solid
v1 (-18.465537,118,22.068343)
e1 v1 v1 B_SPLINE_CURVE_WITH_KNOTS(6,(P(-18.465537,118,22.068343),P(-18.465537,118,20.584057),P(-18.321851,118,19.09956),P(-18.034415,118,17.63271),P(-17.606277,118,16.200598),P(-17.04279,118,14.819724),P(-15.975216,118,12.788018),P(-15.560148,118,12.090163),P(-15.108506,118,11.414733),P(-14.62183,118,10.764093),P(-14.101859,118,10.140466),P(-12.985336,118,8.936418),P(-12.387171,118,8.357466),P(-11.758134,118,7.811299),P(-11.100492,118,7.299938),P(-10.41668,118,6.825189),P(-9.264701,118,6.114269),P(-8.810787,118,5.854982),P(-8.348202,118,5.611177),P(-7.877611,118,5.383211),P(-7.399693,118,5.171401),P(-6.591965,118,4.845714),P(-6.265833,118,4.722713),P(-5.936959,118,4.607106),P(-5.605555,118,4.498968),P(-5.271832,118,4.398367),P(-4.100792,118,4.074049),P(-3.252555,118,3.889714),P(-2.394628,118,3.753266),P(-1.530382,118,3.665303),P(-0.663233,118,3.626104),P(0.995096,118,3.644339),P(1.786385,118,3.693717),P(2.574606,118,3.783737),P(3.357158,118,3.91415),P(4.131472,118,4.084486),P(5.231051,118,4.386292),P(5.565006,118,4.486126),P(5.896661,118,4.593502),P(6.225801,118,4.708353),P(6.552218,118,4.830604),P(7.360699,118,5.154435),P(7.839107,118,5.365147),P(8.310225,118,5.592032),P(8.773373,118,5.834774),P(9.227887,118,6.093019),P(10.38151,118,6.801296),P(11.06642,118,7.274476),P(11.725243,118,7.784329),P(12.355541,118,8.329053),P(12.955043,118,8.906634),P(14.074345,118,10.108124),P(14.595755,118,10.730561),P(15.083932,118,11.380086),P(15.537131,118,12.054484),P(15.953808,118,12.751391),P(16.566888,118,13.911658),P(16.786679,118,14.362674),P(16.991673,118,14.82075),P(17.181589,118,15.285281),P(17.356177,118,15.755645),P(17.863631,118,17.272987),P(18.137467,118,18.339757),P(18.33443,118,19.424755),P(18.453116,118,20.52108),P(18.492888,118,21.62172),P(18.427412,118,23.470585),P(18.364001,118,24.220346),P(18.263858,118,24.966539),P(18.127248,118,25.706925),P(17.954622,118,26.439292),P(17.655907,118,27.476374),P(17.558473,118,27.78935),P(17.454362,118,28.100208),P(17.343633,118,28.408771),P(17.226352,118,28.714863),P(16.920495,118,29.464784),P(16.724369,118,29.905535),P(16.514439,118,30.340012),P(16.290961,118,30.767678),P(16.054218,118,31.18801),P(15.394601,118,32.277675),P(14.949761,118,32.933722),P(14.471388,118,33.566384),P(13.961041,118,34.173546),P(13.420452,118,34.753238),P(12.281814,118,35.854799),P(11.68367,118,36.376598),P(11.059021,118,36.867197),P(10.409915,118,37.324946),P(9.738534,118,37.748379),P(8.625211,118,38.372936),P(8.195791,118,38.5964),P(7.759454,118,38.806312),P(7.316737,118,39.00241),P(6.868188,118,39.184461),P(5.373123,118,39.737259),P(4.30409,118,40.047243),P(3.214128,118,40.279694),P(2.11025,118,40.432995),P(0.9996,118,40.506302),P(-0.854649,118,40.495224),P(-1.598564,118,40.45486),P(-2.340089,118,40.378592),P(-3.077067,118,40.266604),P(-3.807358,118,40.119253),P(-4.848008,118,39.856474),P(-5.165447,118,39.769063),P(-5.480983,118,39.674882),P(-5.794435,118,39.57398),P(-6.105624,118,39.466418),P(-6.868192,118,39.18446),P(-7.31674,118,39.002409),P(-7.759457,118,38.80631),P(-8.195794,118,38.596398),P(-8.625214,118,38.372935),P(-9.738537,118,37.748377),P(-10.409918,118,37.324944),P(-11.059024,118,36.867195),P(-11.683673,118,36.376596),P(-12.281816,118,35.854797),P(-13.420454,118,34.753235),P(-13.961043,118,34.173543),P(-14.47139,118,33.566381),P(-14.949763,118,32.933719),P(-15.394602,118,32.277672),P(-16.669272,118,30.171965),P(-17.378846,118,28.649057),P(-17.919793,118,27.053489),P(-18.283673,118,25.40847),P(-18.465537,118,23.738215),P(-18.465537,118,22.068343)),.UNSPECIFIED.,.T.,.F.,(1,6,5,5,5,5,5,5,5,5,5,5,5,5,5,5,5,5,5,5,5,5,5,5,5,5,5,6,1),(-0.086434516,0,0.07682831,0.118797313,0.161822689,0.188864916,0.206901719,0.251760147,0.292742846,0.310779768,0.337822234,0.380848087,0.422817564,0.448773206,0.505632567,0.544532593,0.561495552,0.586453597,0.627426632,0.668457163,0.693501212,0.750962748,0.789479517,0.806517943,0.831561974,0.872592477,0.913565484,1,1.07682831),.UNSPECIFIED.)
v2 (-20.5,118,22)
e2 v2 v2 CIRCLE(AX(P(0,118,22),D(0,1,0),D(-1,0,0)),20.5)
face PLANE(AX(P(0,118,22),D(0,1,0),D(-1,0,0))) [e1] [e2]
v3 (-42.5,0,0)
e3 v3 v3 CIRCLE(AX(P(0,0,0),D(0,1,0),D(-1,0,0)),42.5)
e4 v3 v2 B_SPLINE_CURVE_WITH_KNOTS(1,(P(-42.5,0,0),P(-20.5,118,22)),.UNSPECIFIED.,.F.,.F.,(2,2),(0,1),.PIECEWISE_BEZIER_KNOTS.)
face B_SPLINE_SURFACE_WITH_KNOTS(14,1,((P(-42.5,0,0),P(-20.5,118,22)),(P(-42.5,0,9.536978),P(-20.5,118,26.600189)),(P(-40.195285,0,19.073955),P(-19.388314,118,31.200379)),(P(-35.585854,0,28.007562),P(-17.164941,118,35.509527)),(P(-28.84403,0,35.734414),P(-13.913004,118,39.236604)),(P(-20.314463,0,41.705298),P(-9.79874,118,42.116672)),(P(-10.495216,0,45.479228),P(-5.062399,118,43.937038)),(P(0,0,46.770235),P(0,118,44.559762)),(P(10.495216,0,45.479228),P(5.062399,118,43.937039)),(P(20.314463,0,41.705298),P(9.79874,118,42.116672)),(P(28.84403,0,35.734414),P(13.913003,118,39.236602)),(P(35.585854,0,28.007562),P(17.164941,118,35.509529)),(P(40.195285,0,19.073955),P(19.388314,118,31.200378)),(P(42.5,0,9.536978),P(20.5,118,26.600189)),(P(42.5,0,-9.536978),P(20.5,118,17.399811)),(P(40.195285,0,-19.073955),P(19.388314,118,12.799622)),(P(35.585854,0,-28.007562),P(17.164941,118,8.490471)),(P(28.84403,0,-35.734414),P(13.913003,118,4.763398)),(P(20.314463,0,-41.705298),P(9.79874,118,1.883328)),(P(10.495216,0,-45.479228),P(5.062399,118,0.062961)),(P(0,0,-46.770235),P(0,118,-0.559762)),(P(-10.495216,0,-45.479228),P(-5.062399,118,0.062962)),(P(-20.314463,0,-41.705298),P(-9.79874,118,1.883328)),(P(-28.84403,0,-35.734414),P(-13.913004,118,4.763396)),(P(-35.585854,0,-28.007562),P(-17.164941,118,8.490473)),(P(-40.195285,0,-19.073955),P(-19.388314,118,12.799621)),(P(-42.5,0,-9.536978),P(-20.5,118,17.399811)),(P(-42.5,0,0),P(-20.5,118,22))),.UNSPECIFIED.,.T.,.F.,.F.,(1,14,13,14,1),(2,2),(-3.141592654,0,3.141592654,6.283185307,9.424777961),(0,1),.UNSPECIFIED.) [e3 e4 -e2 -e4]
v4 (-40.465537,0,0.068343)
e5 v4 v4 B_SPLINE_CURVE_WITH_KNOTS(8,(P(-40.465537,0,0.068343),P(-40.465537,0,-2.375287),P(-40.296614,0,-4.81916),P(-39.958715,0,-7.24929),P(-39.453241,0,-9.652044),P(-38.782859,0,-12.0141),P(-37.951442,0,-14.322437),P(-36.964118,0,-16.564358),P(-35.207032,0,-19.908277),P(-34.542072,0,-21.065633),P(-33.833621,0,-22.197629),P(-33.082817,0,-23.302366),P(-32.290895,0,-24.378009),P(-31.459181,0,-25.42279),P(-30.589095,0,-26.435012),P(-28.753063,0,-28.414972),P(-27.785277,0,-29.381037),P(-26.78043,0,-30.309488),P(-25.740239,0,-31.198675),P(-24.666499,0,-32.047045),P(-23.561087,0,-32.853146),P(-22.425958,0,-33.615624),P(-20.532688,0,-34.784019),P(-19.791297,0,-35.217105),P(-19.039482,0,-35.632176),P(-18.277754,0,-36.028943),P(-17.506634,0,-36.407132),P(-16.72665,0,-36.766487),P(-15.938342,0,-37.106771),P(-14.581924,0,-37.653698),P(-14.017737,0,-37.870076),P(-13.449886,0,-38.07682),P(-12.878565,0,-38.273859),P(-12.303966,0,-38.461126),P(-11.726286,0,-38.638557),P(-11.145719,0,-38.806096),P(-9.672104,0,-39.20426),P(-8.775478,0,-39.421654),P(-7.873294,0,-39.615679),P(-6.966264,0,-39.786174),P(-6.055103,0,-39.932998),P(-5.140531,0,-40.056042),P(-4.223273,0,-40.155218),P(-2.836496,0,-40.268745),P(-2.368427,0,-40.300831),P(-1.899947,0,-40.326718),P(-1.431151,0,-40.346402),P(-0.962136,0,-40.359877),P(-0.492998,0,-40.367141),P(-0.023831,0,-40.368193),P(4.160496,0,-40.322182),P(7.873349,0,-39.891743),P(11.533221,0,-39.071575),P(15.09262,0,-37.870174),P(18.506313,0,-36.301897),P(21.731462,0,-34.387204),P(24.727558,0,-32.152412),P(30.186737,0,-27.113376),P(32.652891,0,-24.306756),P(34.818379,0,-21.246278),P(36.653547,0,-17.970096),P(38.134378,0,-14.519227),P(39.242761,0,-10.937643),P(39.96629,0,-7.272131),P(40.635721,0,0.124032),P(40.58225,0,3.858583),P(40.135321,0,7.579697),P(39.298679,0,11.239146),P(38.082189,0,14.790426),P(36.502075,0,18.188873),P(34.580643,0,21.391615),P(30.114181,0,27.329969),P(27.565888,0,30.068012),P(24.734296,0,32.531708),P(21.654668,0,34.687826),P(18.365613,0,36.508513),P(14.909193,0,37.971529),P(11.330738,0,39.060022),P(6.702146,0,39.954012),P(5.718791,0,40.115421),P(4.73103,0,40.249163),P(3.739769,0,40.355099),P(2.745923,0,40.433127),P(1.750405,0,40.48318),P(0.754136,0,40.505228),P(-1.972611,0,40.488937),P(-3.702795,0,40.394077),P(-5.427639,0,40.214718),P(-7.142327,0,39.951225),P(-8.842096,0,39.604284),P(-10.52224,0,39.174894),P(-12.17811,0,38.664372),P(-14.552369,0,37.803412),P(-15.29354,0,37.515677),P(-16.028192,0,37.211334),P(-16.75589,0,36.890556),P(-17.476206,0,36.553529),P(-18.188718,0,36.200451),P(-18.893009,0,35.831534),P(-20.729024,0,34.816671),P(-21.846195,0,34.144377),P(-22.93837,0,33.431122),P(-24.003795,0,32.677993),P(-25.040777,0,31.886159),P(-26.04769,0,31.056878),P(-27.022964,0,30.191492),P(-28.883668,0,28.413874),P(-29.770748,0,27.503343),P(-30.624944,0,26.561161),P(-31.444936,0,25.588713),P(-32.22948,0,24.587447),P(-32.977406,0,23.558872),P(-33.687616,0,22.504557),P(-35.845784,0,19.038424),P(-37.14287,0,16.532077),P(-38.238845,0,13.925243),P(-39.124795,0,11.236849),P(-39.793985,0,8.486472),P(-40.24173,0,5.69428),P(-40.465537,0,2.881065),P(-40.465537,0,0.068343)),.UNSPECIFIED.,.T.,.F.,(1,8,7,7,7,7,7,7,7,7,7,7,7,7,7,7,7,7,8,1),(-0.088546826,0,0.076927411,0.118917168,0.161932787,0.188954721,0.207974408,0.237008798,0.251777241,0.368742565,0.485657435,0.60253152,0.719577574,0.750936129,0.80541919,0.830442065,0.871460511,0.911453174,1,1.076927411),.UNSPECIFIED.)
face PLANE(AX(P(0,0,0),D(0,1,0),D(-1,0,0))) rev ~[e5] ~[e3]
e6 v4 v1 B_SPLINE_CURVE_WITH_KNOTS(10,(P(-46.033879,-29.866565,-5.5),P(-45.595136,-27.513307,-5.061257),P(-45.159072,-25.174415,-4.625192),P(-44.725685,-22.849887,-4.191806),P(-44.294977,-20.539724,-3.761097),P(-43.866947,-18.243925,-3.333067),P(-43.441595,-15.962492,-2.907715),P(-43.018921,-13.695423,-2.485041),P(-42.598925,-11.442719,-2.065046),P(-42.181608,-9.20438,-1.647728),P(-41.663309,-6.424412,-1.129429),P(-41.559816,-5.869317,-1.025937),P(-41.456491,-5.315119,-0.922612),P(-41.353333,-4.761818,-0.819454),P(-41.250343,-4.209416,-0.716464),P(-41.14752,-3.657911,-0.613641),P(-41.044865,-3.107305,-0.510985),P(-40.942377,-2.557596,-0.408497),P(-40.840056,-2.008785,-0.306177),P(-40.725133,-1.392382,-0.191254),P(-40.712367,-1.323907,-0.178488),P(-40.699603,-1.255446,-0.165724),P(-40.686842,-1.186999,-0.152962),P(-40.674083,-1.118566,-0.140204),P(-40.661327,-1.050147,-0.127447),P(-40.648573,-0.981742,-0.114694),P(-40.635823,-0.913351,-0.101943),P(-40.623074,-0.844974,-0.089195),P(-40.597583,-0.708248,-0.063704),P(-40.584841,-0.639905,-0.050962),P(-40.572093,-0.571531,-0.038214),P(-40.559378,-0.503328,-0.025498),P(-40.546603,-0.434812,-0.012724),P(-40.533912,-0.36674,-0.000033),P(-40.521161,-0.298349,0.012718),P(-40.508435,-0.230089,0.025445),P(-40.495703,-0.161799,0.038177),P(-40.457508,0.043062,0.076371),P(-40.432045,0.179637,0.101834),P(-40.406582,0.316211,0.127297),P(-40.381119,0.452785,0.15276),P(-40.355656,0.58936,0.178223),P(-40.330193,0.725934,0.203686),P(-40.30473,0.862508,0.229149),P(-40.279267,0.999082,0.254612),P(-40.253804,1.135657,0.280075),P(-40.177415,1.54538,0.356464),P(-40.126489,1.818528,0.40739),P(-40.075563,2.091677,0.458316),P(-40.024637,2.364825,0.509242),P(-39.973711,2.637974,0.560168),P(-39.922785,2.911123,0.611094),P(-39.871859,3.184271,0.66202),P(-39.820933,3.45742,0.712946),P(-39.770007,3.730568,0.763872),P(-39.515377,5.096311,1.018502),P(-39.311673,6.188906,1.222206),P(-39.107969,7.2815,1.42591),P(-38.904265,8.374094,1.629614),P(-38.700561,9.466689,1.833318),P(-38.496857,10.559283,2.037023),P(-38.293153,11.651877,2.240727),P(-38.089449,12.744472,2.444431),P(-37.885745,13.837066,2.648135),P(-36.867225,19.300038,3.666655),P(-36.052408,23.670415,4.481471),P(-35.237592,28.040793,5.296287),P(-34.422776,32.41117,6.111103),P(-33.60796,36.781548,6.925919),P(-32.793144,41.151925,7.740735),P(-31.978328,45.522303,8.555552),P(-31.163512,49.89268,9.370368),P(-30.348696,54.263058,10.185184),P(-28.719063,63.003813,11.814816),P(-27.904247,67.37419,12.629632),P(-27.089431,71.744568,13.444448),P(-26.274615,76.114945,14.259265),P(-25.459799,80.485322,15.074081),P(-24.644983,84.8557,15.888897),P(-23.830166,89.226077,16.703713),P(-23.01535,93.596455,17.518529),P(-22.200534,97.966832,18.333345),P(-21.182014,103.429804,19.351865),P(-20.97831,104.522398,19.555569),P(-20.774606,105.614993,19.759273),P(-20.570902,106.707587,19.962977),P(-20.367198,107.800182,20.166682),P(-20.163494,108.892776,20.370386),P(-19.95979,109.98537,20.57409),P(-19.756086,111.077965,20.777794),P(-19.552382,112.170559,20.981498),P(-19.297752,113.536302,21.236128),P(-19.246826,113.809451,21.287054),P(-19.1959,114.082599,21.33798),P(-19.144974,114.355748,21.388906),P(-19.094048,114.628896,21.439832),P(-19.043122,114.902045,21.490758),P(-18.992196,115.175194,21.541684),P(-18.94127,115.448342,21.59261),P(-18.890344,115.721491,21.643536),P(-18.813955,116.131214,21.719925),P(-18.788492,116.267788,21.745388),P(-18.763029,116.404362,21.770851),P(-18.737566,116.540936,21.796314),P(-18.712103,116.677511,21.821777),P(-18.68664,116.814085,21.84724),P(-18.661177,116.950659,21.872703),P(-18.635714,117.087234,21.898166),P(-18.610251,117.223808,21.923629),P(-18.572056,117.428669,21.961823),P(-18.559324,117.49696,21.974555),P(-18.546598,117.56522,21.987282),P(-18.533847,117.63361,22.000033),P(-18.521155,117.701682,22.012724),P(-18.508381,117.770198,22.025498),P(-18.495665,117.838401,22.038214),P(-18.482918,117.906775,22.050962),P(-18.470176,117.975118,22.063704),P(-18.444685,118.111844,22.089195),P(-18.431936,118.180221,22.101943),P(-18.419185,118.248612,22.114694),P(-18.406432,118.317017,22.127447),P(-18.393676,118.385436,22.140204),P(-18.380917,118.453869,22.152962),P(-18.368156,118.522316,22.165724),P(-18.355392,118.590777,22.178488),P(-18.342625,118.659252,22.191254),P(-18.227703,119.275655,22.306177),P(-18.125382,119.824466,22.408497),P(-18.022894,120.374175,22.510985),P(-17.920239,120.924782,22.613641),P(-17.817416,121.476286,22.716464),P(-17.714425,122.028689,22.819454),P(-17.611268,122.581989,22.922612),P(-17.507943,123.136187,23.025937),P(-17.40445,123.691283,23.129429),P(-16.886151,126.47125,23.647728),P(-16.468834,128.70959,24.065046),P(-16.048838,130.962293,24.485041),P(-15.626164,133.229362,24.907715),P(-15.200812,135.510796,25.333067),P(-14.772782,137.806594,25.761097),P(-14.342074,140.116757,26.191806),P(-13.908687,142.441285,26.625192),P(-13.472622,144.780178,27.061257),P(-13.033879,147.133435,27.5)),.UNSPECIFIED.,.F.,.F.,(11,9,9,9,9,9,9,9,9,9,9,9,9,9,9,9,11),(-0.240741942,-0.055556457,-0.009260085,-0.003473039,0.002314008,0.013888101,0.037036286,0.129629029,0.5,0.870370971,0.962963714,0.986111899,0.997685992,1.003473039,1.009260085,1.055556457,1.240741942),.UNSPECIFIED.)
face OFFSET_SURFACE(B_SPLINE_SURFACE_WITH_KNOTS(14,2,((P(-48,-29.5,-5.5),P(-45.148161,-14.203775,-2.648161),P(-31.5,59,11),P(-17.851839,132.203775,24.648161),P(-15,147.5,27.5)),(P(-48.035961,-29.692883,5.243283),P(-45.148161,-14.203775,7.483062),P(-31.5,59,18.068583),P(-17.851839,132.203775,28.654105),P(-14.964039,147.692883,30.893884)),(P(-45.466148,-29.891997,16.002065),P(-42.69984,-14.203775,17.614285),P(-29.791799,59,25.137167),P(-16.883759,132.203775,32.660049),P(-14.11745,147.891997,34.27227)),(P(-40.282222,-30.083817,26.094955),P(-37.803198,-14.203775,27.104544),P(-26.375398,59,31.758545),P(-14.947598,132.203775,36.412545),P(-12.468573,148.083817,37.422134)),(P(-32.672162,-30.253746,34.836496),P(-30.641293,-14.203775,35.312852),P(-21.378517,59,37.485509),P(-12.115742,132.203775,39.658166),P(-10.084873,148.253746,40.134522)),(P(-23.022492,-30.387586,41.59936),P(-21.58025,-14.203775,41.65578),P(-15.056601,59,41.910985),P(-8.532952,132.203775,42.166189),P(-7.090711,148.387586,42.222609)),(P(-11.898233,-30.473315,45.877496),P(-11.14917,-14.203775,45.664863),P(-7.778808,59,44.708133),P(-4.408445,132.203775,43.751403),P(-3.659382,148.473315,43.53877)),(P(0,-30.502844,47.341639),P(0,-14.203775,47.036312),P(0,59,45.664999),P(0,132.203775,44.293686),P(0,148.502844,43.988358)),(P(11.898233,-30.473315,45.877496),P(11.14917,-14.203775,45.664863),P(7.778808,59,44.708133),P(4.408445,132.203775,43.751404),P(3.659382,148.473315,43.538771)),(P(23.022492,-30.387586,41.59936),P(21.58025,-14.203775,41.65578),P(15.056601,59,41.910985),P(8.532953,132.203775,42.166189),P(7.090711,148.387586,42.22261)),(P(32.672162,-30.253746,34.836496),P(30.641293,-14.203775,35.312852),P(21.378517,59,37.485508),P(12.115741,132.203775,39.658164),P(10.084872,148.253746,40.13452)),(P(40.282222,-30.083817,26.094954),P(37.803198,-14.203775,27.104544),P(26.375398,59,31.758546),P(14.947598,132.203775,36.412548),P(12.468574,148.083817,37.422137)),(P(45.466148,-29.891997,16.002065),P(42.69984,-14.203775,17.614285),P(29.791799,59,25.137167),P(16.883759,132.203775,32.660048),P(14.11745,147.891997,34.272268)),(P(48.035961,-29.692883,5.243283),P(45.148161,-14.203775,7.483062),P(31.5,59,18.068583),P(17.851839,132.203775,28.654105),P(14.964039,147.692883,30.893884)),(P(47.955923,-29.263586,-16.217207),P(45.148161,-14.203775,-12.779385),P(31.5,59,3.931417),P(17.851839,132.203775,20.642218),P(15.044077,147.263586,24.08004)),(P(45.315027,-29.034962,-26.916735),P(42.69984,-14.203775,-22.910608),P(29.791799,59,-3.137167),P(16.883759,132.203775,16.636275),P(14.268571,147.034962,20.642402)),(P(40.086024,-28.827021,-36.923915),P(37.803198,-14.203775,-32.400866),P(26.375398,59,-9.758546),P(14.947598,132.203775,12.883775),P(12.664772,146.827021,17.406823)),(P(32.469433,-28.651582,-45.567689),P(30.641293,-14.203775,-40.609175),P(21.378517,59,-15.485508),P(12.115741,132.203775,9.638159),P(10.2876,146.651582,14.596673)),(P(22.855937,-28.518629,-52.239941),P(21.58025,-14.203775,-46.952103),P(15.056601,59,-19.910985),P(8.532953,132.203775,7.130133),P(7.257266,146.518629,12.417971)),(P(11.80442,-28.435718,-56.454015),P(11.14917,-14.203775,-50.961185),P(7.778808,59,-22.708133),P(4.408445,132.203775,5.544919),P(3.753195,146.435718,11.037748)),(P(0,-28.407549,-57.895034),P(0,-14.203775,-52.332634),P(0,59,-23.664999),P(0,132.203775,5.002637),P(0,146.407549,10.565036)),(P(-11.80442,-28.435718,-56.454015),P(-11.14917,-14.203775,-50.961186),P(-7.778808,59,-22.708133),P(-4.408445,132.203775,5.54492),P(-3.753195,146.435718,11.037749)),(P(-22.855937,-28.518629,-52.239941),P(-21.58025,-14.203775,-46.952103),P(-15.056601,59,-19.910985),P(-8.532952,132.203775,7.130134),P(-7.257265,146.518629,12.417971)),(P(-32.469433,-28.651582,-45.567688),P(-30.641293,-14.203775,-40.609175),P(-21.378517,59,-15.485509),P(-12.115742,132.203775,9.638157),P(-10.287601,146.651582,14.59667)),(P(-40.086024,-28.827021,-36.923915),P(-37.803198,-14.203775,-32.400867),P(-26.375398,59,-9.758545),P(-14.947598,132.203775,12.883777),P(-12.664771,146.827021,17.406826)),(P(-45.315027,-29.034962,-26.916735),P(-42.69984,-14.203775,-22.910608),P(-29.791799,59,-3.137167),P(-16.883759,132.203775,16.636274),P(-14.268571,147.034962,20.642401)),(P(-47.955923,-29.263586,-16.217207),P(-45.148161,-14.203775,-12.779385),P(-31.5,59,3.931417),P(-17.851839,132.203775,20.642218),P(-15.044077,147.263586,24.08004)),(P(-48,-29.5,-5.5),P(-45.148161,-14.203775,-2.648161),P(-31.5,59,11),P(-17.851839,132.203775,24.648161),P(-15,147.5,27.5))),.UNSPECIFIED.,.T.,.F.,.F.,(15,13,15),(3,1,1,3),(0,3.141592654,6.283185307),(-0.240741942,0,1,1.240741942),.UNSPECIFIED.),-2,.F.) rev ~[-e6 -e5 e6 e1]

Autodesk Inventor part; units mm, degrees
ref_plane "YZ Plane" through (0, 0, 0) normal (1, 0, 0) x (0, 1, 0)
ref_plane "XY Plane" through (0, 0, 0) normal (0, 0, 1) x (1, 0, 0)
sketch "Szkic6" plane through (0, 0, 0) normal (0, 1, 0) x (-1, 0, 0)
  circle A0 centre (0, 0) radius 42.5
  dimension "d33" = 85
ref_plane "Płaszczyzna konstrukcyjna1" through (0, 118, 0) normal (0, 1, 0) x (-1, 0, 0)
sketch "Szkic7" plane through (0, 118, 0) normal (0, 1, 0) x (-1, 0, 0)
  circle A0 centre (0, 22) radius 20.5
  line L0 (0, -20.3) -> (0, 20.3) construction
  circle A1 centre (0, 0) radius 42.5 construction
  dimension "d35" = 41
loft "Wyciągnięcie złożone1" add profiles "Szkic6", "Szkic7"
shell "Skorupa1" thickness 2 removed faces 2 at (4.592, 118, 24.4101) at (10.6049, 0, 7.3037)
equation "\"d33\" = OD1"
equation "\"d35\" = OD2"
equation "\"d52\" = THK"
equation "\"SzerokośćGięciaPodcięcia\" = Grubość"
equation "\"RozmiarPodcięciaNarożnika\" = 4 * Grubość"
equation "\"PromieńPrzejścia\" = PromieńGięcia"
equation "\"Rozmiar_promienia_Jacobiego\" = PromieńGięcia"
equation "\"Wielk_odstępu\" = Grubość"
equation "\"d2\" = PromieńGięcia"
equation "\"d23\" = PromieńGięcia"
equation "\"OD1\" = 85"
equation "\"OD2\" = 41"
equation "\"L\" = 118"
equation "\"THK\" = 2"
equation "\"d34\" = L"
equation "\"Grubość\" = 1.5"
equation "\"PromieńGięcia\" = 3"
properties part number "Redukcja asymetryczna Ø85x41x2 L=118" material "304"
